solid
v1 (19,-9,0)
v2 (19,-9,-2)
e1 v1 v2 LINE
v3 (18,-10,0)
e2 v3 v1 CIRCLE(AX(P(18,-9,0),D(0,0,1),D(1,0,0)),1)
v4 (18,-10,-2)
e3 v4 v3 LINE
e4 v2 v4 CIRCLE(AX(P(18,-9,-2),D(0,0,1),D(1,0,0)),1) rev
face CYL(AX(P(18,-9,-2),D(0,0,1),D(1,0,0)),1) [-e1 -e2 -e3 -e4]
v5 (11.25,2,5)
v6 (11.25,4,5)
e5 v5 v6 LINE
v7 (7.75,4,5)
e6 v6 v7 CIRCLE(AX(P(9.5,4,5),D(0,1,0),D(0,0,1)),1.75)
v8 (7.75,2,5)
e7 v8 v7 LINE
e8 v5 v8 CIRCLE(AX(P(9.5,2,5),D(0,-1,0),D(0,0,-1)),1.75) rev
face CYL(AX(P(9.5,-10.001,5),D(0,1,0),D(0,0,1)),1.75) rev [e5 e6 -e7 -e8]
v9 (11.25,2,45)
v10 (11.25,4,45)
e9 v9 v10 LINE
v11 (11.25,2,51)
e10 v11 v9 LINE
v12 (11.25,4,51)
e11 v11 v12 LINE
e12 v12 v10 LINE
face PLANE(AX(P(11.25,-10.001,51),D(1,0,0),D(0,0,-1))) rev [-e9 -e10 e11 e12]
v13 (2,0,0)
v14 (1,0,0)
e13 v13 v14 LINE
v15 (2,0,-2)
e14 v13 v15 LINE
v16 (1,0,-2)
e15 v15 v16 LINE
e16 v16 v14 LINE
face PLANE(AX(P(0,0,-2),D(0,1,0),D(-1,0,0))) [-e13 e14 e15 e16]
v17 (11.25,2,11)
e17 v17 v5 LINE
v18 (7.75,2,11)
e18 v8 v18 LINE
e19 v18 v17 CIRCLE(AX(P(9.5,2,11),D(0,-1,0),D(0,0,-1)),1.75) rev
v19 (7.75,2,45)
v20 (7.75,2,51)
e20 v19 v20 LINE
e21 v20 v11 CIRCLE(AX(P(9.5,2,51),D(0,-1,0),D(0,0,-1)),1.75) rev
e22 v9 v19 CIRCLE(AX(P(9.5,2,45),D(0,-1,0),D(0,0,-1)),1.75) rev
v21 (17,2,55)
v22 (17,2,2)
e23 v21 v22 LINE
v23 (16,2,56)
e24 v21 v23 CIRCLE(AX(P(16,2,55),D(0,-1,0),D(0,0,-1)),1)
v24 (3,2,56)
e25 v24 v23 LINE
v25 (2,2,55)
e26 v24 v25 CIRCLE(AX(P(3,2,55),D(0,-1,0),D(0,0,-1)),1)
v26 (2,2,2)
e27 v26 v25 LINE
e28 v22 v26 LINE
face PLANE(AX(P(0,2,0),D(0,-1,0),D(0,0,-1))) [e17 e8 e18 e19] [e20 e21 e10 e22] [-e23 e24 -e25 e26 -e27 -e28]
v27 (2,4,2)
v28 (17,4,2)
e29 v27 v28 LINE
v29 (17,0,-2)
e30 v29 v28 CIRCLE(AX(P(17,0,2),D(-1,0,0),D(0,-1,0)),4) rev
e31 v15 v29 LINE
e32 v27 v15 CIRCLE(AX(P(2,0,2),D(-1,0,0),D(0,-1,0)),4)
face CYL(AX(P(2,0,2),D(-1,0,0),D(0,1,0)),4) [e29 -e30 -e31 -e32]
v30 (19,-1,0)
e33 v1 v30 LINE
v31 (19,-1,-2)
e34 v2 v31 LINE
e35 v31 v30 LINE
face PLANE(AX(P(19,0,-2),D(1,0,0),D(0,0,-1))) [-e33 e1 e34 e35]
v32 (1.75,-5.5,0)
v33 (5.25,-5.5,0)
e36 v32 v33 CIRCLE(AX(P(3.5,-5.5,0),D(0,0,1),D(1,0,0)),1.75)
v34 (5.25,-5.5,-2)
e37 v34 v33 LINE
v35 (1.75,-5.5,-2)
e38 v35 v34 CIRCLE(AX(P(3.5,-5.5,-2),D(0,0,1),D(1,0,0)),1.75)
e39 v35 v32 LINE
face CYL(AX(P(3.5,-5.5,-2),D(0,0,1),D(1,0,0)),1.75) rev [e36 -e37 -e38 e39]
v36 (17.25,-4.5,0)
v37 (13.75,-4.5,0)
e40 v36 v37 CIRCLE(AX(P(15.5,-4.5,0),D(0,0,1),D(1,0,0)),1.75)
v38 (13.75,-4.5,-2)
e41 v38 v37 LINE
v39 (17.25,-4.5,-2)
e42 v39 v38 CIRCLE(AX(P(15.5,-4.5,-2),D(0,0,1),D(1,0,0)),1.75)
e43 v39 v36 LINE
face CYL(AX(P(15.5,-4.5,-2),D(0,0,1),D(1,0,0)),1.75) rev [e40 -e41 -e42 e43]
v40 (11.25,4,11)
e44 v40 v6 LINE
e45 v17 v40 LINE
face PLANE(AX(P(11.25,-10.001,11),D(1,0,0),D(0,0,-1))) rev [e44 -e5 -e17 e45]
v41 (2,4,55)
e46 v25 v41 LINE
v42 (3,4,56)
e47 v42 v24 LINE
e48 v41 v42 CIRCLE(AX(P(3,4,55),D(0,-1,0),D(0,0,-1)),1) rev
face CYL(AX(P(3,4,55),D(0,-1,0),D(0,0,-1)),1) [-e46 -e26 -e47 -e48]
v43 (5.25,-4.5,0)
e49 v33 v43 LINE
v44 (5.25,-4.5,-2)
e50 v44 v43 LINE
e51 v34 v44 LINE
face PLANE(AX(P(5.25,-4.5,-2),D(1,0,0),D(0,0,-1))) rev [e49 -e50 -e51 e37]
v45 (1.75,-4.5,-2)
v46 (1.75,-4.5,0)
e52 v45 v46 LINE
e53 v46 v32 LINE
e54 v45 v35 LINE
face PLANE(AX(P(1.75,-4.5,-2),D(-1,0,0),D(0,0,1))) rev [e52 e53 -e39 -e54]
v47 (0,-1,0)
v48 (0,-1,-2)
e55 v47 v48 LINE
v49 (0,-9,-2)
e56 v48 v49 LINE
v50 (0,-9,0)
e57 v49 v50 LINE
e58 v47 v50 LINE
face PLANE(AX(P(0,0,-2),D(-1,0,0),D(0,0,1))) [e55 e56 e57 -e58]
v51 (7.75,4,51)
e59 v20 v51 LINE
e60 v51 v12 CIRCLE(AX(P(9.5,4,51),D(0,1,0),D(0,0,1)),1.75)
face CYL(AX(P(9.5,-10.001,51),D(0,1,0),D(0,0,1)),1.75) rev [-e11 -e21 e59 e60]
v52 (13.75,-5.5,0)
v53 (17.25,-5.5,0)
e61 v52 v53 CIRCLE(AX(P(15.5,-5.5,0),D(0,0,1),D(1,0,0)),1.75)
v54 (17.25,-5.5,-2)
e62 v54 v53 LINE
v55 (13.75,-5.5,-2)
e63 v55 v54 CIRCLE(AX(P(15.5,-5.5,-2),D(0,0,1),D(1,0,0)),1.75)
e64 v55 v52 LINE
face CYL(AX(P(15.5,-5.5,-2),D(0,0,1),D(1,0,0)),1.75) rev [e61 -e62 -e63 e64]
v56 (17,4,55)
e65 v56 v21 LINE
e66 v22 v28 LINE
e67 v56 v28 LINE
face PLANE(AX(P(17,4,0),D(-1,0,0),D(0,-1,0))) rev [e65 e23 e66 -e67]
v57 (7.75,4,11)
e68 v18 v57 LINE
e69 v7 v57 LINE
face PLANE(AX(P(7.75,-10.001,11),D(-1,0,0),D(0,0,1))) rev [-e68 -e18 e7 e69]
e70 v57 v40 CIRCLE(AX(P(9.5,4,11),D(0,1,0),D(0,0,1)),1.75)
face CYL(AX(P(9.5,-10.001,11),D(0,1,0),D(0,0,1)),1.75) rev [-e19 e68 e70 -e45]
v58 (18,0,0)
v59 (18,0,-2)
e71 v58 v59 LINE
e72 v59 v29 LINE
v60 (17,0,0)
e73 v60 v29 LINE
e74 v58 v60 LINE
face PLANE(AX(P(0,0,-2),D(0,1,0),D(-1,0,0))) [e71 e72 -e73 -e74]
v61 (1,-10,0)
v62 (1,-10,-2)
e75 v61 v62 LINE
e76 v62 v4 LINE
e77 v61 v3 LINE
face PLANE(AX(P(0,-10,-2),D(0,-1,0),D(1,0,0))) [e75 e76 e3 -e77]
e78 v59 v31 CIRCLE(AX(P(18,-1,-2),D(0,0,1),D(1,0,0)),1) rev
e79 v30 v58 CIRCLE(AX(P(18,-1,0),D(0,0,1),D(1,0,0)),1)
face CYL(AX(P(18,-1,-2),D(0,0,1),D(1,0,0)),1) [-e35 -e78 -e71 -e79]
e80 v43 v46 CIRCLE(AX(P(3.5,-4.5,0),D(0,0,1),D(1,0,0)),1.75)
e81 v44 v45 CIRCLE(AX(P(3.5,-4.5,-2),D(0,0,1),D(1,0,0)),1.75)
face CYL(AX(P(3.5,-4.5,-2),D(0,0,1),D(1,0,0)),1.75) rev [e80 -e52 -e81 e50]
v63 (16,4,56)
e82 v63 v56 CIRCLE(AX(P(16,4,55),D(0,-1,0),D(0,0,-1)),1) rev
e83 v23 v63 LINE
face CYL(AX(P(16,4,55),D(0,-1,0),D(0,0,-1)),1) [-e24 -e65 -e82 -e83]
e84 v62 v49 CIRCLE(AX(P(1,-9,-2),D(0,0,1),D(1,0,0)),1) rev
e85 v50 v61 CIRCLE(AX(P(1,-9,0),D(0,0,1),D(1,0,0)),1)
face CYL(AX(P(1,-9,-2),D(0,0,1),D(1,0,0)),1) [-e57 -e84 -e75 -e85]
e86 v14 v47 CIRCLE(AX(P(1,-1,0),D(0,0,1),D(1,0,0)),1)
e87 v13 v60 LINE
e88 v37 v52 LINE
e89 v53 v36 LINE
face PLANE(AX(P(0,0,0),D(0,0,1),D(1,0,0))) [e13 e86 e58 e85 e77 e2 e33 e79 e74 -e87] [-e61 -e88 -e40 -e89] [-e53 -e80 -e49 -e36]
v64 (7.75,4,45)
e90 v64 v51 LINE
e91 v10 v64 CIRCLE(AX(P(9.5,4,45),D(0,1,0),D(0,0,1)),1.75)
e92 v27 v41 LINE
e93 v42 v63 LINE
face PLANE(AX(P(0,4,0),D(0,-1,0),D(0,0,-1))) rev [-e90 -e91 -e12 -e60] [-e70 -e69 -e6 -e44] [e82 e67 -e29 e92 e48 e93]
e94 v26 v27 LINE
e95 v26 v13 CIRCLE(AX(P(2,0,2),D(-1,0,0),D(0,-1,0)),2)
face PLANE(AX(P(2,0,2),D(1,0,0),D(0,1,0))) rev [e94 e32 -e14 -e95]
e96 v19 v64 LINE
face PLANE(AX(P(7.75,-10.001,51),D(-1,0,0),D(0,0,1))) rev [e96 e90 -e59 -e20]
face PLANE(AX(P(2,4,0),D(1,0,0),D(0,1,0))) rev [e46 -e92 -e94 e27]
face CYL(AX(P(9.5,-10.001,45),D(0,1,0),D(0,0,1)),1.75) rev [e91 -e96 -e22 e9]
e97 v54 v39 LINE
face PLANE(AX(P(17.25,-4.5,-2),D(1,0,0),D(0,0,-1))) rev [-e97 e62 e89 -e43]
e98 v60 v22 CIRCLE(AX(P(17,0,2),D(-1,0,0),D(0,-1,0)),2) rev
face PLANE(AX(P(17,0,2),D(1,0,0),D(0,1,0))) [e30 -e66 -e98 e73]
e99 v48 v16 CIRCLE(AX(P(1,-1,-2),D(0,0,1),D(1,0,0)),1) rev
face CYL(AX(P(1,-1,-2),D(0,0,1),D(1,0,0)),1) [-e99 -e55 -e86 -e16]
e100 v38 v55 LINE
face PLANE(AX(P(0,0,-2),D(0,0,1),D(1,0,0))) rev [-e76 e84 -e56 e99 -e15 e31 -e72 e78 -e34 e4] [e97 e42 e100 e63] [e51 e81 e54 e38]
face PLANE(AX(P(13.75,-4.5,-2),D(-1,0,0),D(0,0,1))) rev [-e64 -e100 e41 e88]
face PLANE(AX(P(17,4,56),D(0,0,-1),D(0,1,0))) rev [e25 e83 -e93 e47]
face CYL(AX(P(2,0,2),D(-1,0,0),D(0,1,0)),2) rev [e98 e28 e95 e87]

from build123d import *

# Parameters (mm, degrees)
CROQUIS1_W             = 19
CROQUIS1_H             = 10
BRIDA_BASE1_DEPTH      = 2
BRIDA_DE_ARISTA1_DEPTH = 15
CORTAR_EXTRUIR1_REACH  = 62.77
REDONDEO1_R            = 1


# Sheet-metal steps are written as plain solids
with BuildPart() as part:
    # Croquis1 → Brida base1 (new body)
    with BuildSketch(Plane.XY):
        with Locations((9.5, -5)):
            Rectangle(CROQUIS1_W, CROQUIS1_H)
        with BuildLine():
            Line((5.25, -4.5), (5.25, -5.5))
            ThreePointArc((5.25, -5.5), (3.5, -7.25), (1.75, -5.5))
            Line((1.75, -5.5), (1.75, -4.5))
            ThreePointArc((1.75, -4.5), (3.5, -2.75), (5.25, -4.5))
        make_face(mode=Mode.SUBTRACT)
        with BuildLine():
            Line((17.25, -4.5), (17.25, -5.5))
            ThreePointArc((17.25, -5.5), (15.5, -7.25), (13.75, -5.5))
            Line((13.75, -5.5), (13.75, -4.5))
            ThreePointArc((13.75, -4.5), (15.5, -2.75), (17.25, -4.5))
        make_face(mode=Mode.SUBTRACT)
    extrude(amount=-BRIDA_BASE1_DEPTH)

    # Brida de arista1 section (across the edge) → Brida de arista1 (add)
    with BuildSketch(Plane(origin=(17, 2, 0), x_dir=(0, -1, 0), z_dir=(-1, 0, 0))):
        with BuildLine():
            Line((-2, 2), (-2, 56))
            Line((-2, 56), (0, 56))
            Line((0, 56), (0, 2))
            ThreePointArc((0, 2), (0.585786438, 0.585786438), (2, 0))
            Line((2, 0), (2, -2))
            ThreePointArc((2, -2), (-0.828427125, -0.828427125), (-2, 2))
        make_face()
    extrude(amount=BRIDA_DE_ARISTA1_DEPTH)

    # Croquis9 → Cortar-Extruir1 (cut, up to next)
    with BuildSketch(Plane(origin=(0, 4, 0), x_dir=(1, 0, 0), z_dir=(0, 1, 0)), mode=Mode.PRIVATE) as cortar_extruir1_sk1:
        with BuildLine():
            Line((7.75, -11), (7.75, -5))
            ThreePointArc((7.75, -5), (9.5, -3.25), (11.25, -5))
            Line((11.25, -5), (11.25, -11))
            ThreePointArc((11.25, -11), (9.5, -12.75), (7.75, -11))
        make_face()
    cortar_extruir1_tool1 = extrude(cortar_extruir1_sk1.sketch, amount=-CORTAR_EXTRUIR1_REACH, mode=Mode.PRIVATE) & part.part
    # Croquis9 → Cortar-Extruir1 (cut, up to next)
    with BuildSketch(Plane(origin=(0, 4, 0), x_dir=(1, 0, 0), z_dir=(0, 1, 0)), mode=Mode.PRIVATE) as cortar_extruir1_sk2:
        with BuildLine():
            Line((7.75, -51), (7.75, -45))
            ThreePointArc((7.75, -45), (9.5, -43.25), (11.25, -45))
            Line((11.25, -45), (11.25, -51))
            ThreePointArc((11.25, -51), (9.5, -52.75), (7.75, -51))
        make_face()
    cortar_extruir1_tool2 = extrude(cortar_extruir1_sk2.sketch, amount=-CORTAR_EXTRUIR1_REACH, mode=Mode.PRIVATE) & part.part
    add(cortar_extruir1_tool1.solids().sort_by_distance((9.5, 4, 8))[0], mode=Mode.SUBTRACT)
    add(cortar_extruir1_tool2.solids().sort_by_distance((9.5, 4, 48))[0], mode=Mode.SUBTRACT)

    # Redondeo1
    redondeo1_edges = [part.edges().sort_by_distance(p)[0] for p in [
        (17, 3, 56),
        (2, 3, 56),
        (0, 0, -1),
        (19, 0, -1),
        (19, -10, -1),
        (0, -10, -1),
    ]]
    fillet(redondeo1_edges, radius=REDONDEO1_R)


solid = part.part
